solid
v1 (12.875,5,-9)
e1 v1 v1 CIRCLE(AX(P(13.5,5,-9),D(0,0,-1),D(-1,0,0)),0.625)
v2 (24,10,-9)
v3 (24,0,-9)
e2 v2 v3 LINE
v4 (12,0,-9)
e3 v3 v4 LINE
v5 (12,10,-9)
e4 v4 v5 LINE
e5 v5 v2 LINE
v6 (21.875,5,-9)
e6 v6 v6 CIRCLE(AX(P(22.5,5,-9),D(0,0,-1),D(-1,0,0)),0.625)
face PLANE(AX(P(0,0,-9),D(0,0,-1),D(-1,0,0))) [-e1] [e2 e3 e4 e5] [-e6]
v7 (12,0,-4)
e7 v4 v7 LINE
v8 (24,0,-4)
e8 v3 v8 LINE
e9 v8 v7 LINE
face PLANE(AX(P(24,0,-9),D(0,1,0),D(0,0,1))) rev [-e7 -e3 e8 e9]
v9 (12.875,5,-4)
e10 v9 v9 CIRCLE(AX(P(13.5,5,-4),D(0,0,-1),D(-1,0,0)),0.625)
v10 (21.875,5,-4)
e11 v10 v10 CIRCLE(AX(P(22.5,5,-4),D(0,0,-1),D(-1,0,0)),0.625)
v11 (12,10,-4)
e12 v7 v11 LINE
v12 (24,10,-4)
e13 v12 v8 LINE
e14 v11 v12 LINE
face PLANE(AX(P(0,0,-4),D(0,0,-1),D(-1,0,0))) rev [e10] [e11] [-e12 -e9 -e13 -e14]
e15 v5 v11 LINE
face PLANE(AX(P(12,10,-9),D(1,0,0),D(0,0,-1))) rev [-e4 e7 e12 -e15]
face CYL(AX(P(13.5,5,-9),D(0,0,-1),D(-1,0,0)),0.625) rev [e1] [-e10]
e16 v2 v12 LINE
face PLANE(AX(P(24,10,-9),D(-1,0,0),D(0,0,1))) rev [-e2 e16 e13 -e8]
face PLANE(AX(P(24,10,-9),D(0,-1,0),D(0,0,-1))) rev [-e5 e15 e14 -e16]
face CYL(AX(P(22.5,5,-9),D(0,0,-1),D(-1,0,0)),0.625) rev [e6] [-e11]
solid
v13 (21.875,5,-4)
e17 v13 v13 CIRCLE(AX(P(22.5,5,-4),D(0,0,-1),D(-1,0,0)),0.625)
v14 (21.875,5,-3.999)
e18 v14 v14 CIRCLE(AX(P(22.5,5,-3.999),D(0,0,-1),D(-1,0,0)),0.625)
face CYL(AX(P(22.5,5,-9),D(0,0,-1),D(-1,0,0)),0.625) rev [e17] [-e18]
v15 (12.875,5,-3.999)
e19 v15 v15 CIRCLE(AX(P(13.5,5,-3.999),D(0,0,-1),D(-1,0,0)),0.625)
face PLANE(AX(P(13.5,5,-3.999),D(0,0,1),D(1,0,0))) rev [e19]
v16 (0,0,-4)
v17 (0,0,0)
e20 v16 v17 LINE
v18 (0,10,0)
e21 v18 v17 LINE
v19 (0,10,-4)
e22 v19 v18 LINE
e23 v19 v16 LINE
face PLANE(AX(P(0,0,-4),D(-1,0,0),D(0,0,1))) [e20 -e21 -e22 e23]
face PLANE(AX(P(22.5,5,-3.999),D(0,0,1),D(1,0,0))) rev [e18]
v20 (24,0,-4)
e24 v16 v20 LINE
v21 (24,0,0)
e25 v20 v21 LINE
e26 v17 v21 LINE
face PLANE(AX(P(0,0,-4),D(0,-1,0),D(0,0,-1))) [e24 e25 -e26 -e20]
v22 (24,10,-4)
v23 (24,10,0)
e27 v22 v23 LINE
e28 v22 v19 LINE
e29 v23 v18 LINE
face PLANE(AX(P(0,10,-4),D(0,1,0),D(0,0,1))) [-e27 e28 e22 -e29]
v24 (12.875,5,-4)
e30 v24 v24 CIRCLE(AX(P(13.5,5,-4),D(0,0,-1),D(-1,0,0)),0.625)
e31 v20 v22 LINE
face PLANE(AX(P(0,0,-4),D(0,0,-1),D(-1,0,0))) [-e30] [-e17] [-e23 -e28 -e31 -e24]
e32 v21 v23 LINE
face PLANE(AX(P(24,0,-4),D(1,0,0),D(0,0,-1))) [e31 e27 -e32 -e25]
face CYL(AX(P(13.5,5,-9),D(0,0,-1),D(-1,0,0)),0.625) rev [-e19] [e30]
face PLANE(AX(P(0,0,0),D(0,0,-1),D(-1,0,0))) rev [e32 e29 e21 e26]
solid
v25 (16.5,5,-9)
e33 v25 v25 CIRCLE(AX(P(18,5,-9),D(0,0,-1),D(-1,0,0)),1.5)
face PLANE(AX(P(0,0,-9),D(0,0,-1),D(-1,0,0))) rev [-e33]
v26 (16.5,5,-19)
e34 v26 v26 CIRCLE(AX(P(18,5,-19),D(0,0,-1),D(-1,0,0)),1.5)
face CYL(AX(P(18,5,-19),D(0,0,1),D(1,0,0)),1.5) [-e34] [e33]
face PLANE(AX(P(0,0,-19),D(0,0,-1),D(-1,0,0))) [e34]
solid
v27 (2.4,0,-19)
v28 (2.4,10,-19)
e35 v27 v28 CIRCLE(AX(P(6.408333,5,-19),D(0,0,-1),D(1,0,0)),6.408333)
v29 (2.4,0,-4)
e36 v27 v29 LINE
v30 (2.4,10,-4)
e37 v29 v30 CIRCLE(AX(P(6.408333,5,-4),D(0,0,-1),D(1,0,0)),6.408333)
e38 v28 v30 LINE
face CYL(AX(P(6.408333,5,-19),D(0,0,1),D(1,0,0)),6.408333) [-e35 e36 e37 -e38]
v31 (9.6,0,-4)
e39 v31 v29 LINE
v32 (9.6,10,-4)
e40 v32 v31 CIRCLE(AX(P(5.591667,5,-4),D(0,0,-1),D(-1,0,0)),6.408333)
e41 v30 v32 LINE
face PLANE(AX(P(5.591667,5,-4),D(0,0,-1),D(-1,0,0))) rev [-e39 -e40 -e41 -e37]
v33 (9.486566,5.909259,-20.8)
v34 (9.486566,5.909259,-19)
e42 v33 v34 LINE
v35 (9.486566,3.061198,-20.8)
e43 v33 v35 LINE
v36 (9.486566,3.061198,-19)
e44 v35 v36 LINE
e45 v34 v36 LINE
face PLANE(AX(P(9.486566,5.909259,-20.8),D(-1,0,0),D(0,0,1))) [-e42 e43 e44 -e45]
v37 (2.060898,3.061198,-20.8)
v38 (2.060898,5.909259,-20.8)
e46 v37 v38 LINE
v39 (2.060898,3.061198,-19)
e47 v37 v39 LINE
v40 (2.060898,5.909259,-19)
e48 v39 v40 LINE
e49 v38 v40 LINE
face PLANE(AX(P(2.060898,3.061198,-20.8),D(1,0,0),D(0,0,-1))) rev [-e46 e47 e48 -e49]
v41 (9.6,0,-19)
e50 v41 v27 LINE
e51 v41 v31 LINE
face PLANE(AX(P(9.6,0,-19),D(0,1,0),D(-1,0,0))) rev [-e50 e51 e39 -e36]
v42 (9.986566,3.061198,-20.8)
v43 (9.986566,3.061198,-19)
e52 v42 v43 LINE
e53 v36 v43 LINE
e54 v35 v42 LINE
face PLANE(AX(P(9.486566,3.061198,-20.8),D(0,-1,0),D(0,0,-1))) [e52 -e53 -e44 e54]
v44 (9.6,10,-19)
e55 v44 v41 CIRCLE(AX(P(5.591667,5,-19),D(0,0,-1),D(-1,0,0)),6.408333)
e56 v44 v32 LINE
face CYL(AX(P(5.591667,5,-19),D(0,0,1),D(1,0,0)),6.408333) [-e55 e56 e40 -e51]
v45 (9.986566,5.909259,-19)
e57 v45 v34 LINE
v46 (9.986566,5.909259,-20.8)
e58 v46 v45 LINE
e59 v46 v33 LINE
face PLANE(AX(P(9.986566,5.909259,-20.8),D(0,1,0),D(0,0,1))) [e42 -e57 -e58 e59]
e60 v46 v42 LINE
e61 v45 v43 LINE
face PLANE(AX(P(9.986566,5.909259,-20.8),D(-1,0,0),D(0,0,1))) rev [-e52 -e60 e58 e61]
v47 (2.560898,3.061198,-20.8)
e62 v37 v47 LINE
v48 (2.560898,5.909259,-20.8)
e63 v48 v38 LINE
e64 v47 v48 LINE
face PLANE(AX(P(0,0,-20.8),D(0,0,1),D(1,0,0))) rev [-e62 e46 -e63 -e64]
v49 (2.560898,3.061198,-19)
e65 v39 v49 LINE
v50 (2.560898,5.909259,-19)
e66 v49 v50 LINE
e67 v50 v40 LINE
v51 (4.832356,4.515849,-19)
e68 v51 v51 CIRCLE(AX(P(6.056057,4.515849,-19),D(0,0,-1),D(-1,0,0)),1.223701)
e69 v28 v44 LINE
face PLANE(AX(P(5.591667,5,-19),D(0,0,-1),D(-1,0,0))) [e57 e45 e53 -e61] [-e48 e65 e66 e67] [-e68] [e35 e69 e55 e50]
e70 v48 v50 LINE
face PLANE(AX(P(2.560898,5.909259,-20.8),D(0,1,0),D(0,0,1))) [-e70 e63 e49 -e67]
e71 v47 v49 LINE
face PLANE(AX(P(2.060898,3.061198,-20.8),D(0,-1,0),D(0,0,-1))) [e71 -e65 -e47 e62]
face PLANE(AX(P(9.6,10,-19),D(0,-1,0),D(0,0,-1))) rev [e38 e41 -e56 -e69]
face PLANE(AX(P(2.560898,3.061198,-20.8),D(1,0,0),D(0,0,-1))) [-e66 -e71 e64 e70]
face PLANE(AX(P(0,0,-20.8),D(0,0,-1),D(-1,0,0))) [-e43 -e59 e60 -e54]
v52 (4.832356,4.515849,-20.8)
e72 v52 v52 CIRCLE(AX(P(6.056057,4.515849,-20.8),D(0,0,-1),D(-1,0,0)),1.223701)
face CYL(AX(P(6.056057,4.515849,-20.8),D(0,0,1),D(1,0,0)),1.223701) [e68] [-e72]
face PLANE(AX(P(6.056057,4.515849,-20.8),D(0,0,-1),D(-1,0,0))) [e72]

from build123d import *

# Parameters (mm, degrees)
SKETCH_1_W                   = 24
SKETCH_1_H                   = 10
EXTRUDE_1_DEPTH              = 4
EXTRUDE_2_DEPTH              = 15
SKETCH_3_W                   = 0.5
SKETCH_3_H                   = 2.848061163
EXTRUDE_1_2_DEPTH            = 1.8
SKETCH_4_R                   = 1.223700811
EXTRUDE_3_DEPTH              = 1.8
SKETCH_5_W                   = 12
SKETCH_5_H                   = 10
EXTRUDE_4_DEPTH              = 5
SKETCH_6_R                   = 1.5
EXTRUDE_5_DEPTH              = 10
HOLE_START                   = -9
HOLE_WIZARD_M1_6_1_OUTLINE_R = 0.625
HOLE_WIZARD_M1_6_1_DEPTH     = 5.001


# Read off the part's stored shape, not the designer's step: M1.6 螺纹孔1
with BuildPart() as part:
    # 草图1 → Extrude 1 (new body)
    with BuildSketch(Plane.XY):
        with Locations((12, 5)):
            Rectangle(SKETCH_1_W, SKETCH_1_H)
    extrude(amount=-EXTRUDE_1_DEPTH)


with BuildPart() as body_2:
    # 草图2 → 凸台-拉伸2 (new body)
    with BuildSketch(Plane(origin=(0, 0, -4), x_dir=(-1, 0, 0), z_dir=(0, 0, -1))):
        with BuildLine():
            Line((-9.6, 0), (-2.4, 0))
            ThreePointArc((-2.4, 0), (0, 5), (-2.4, 10))
            Line((-2.4, 10), (-9.6, 10))
            ThreePointArc((-9.6, 10), (-12, 5), (-9.6, 0))
        make_face()
    extrude(amount=EXTRUDE_2_DEPTH)

    # 草图3 → Extrude 1 2 (add)
    with BuildSketch(Plane(origin=(0, 0, -19), x_dir=(-1, 0, 0), z_dir=(0, 0, -1))):
        with Locations((-9.736566452, 4.48522879)):
            Rectangle(SKETCH_3_W, SKETCH_3_H)
        with Locations((-2.310898304, 4.48522879)):
            Rectangle(SKETCH_3_W, SKETCH_3_H)
    extrude(amount=EXTRUDE_1_2_DEPTH)

    # 草图4 → 凸台-拉伸3 (add)
    with BuildSketch(Plane(origin=(0, 0, -19), x_dir=(-1, 0, 0), z_dir=(0, 0, -1))):
        with Locations((-6.056056762, 4.515848892)):
            Circle(SKETCH_4_R)
    extrude(amount=EXTRUDE_3_DEPTH)


with BuildPart() as body_3:
    # 草图5 → 凸台-拉伸4 (new body)
    with BuildSketch(Plane(origin=(0, 0, -4), x_dir=(-1, 0, 0), z_dir=(0, 0, -1))):
        with Locations((-18, 5)):
            Rectangle(SKETCH_5_W, SKETCH_5_H)
    extrude(amount=EXTRUDE_4_DEPTH)


with BuildPart() as body_4:
    # 草图6 → 凸台-拉伸5 (new body)
    with BuildSketch(Plane(origin=(0, 0, -9), x_dir=(-1, 0, 0), z_dir=(0, 0, -1))):
        with Locations((-18, 5)):
            Circle(SKETCH_6_R)
    extrude(amount=EXTRUDE_5_DEPTH)


with BuildPart() as hole_wizard_m1_6_1_tool:
    # M1.6 螺纹孔1 outline → M1.6 螺纹孔1 (new body)
    with BuildSketch(Plane.XY.offset(HOLE_START)):
        with Locations((13.5, 5)):
            Circle(HOLE_WIZARD_M1_6_1_OUTLINE_R)
        with Locations((22.5, 5)):
            Circle(HOLE_WIZARD_M1_6_1_OUTLINE_R)
    extrude(amount=HOLE_WIZARD_M1_6_1_DEPTH)


with BuildPart() as part_1:
    add(part.part)

    # M1.6 螺纹孔1: cut by hole_wizard_m1_6_1_tool
    add(hole_wizard_m1_6_1_tool.part, mode=Mode.SUBTRACT)


with BuildPart() as body_3_1:
    add(body_3.part)

    # M1.6 螺纹孔1: cut by hole_wizard_m1_6_1_tool
    add(hole_wizard_m1_6_1_tool.part, mode=Mode.SUBTRACT)


solid = Compound([body_2.part, body_4.part, part_1.part, body_3_1.part])
